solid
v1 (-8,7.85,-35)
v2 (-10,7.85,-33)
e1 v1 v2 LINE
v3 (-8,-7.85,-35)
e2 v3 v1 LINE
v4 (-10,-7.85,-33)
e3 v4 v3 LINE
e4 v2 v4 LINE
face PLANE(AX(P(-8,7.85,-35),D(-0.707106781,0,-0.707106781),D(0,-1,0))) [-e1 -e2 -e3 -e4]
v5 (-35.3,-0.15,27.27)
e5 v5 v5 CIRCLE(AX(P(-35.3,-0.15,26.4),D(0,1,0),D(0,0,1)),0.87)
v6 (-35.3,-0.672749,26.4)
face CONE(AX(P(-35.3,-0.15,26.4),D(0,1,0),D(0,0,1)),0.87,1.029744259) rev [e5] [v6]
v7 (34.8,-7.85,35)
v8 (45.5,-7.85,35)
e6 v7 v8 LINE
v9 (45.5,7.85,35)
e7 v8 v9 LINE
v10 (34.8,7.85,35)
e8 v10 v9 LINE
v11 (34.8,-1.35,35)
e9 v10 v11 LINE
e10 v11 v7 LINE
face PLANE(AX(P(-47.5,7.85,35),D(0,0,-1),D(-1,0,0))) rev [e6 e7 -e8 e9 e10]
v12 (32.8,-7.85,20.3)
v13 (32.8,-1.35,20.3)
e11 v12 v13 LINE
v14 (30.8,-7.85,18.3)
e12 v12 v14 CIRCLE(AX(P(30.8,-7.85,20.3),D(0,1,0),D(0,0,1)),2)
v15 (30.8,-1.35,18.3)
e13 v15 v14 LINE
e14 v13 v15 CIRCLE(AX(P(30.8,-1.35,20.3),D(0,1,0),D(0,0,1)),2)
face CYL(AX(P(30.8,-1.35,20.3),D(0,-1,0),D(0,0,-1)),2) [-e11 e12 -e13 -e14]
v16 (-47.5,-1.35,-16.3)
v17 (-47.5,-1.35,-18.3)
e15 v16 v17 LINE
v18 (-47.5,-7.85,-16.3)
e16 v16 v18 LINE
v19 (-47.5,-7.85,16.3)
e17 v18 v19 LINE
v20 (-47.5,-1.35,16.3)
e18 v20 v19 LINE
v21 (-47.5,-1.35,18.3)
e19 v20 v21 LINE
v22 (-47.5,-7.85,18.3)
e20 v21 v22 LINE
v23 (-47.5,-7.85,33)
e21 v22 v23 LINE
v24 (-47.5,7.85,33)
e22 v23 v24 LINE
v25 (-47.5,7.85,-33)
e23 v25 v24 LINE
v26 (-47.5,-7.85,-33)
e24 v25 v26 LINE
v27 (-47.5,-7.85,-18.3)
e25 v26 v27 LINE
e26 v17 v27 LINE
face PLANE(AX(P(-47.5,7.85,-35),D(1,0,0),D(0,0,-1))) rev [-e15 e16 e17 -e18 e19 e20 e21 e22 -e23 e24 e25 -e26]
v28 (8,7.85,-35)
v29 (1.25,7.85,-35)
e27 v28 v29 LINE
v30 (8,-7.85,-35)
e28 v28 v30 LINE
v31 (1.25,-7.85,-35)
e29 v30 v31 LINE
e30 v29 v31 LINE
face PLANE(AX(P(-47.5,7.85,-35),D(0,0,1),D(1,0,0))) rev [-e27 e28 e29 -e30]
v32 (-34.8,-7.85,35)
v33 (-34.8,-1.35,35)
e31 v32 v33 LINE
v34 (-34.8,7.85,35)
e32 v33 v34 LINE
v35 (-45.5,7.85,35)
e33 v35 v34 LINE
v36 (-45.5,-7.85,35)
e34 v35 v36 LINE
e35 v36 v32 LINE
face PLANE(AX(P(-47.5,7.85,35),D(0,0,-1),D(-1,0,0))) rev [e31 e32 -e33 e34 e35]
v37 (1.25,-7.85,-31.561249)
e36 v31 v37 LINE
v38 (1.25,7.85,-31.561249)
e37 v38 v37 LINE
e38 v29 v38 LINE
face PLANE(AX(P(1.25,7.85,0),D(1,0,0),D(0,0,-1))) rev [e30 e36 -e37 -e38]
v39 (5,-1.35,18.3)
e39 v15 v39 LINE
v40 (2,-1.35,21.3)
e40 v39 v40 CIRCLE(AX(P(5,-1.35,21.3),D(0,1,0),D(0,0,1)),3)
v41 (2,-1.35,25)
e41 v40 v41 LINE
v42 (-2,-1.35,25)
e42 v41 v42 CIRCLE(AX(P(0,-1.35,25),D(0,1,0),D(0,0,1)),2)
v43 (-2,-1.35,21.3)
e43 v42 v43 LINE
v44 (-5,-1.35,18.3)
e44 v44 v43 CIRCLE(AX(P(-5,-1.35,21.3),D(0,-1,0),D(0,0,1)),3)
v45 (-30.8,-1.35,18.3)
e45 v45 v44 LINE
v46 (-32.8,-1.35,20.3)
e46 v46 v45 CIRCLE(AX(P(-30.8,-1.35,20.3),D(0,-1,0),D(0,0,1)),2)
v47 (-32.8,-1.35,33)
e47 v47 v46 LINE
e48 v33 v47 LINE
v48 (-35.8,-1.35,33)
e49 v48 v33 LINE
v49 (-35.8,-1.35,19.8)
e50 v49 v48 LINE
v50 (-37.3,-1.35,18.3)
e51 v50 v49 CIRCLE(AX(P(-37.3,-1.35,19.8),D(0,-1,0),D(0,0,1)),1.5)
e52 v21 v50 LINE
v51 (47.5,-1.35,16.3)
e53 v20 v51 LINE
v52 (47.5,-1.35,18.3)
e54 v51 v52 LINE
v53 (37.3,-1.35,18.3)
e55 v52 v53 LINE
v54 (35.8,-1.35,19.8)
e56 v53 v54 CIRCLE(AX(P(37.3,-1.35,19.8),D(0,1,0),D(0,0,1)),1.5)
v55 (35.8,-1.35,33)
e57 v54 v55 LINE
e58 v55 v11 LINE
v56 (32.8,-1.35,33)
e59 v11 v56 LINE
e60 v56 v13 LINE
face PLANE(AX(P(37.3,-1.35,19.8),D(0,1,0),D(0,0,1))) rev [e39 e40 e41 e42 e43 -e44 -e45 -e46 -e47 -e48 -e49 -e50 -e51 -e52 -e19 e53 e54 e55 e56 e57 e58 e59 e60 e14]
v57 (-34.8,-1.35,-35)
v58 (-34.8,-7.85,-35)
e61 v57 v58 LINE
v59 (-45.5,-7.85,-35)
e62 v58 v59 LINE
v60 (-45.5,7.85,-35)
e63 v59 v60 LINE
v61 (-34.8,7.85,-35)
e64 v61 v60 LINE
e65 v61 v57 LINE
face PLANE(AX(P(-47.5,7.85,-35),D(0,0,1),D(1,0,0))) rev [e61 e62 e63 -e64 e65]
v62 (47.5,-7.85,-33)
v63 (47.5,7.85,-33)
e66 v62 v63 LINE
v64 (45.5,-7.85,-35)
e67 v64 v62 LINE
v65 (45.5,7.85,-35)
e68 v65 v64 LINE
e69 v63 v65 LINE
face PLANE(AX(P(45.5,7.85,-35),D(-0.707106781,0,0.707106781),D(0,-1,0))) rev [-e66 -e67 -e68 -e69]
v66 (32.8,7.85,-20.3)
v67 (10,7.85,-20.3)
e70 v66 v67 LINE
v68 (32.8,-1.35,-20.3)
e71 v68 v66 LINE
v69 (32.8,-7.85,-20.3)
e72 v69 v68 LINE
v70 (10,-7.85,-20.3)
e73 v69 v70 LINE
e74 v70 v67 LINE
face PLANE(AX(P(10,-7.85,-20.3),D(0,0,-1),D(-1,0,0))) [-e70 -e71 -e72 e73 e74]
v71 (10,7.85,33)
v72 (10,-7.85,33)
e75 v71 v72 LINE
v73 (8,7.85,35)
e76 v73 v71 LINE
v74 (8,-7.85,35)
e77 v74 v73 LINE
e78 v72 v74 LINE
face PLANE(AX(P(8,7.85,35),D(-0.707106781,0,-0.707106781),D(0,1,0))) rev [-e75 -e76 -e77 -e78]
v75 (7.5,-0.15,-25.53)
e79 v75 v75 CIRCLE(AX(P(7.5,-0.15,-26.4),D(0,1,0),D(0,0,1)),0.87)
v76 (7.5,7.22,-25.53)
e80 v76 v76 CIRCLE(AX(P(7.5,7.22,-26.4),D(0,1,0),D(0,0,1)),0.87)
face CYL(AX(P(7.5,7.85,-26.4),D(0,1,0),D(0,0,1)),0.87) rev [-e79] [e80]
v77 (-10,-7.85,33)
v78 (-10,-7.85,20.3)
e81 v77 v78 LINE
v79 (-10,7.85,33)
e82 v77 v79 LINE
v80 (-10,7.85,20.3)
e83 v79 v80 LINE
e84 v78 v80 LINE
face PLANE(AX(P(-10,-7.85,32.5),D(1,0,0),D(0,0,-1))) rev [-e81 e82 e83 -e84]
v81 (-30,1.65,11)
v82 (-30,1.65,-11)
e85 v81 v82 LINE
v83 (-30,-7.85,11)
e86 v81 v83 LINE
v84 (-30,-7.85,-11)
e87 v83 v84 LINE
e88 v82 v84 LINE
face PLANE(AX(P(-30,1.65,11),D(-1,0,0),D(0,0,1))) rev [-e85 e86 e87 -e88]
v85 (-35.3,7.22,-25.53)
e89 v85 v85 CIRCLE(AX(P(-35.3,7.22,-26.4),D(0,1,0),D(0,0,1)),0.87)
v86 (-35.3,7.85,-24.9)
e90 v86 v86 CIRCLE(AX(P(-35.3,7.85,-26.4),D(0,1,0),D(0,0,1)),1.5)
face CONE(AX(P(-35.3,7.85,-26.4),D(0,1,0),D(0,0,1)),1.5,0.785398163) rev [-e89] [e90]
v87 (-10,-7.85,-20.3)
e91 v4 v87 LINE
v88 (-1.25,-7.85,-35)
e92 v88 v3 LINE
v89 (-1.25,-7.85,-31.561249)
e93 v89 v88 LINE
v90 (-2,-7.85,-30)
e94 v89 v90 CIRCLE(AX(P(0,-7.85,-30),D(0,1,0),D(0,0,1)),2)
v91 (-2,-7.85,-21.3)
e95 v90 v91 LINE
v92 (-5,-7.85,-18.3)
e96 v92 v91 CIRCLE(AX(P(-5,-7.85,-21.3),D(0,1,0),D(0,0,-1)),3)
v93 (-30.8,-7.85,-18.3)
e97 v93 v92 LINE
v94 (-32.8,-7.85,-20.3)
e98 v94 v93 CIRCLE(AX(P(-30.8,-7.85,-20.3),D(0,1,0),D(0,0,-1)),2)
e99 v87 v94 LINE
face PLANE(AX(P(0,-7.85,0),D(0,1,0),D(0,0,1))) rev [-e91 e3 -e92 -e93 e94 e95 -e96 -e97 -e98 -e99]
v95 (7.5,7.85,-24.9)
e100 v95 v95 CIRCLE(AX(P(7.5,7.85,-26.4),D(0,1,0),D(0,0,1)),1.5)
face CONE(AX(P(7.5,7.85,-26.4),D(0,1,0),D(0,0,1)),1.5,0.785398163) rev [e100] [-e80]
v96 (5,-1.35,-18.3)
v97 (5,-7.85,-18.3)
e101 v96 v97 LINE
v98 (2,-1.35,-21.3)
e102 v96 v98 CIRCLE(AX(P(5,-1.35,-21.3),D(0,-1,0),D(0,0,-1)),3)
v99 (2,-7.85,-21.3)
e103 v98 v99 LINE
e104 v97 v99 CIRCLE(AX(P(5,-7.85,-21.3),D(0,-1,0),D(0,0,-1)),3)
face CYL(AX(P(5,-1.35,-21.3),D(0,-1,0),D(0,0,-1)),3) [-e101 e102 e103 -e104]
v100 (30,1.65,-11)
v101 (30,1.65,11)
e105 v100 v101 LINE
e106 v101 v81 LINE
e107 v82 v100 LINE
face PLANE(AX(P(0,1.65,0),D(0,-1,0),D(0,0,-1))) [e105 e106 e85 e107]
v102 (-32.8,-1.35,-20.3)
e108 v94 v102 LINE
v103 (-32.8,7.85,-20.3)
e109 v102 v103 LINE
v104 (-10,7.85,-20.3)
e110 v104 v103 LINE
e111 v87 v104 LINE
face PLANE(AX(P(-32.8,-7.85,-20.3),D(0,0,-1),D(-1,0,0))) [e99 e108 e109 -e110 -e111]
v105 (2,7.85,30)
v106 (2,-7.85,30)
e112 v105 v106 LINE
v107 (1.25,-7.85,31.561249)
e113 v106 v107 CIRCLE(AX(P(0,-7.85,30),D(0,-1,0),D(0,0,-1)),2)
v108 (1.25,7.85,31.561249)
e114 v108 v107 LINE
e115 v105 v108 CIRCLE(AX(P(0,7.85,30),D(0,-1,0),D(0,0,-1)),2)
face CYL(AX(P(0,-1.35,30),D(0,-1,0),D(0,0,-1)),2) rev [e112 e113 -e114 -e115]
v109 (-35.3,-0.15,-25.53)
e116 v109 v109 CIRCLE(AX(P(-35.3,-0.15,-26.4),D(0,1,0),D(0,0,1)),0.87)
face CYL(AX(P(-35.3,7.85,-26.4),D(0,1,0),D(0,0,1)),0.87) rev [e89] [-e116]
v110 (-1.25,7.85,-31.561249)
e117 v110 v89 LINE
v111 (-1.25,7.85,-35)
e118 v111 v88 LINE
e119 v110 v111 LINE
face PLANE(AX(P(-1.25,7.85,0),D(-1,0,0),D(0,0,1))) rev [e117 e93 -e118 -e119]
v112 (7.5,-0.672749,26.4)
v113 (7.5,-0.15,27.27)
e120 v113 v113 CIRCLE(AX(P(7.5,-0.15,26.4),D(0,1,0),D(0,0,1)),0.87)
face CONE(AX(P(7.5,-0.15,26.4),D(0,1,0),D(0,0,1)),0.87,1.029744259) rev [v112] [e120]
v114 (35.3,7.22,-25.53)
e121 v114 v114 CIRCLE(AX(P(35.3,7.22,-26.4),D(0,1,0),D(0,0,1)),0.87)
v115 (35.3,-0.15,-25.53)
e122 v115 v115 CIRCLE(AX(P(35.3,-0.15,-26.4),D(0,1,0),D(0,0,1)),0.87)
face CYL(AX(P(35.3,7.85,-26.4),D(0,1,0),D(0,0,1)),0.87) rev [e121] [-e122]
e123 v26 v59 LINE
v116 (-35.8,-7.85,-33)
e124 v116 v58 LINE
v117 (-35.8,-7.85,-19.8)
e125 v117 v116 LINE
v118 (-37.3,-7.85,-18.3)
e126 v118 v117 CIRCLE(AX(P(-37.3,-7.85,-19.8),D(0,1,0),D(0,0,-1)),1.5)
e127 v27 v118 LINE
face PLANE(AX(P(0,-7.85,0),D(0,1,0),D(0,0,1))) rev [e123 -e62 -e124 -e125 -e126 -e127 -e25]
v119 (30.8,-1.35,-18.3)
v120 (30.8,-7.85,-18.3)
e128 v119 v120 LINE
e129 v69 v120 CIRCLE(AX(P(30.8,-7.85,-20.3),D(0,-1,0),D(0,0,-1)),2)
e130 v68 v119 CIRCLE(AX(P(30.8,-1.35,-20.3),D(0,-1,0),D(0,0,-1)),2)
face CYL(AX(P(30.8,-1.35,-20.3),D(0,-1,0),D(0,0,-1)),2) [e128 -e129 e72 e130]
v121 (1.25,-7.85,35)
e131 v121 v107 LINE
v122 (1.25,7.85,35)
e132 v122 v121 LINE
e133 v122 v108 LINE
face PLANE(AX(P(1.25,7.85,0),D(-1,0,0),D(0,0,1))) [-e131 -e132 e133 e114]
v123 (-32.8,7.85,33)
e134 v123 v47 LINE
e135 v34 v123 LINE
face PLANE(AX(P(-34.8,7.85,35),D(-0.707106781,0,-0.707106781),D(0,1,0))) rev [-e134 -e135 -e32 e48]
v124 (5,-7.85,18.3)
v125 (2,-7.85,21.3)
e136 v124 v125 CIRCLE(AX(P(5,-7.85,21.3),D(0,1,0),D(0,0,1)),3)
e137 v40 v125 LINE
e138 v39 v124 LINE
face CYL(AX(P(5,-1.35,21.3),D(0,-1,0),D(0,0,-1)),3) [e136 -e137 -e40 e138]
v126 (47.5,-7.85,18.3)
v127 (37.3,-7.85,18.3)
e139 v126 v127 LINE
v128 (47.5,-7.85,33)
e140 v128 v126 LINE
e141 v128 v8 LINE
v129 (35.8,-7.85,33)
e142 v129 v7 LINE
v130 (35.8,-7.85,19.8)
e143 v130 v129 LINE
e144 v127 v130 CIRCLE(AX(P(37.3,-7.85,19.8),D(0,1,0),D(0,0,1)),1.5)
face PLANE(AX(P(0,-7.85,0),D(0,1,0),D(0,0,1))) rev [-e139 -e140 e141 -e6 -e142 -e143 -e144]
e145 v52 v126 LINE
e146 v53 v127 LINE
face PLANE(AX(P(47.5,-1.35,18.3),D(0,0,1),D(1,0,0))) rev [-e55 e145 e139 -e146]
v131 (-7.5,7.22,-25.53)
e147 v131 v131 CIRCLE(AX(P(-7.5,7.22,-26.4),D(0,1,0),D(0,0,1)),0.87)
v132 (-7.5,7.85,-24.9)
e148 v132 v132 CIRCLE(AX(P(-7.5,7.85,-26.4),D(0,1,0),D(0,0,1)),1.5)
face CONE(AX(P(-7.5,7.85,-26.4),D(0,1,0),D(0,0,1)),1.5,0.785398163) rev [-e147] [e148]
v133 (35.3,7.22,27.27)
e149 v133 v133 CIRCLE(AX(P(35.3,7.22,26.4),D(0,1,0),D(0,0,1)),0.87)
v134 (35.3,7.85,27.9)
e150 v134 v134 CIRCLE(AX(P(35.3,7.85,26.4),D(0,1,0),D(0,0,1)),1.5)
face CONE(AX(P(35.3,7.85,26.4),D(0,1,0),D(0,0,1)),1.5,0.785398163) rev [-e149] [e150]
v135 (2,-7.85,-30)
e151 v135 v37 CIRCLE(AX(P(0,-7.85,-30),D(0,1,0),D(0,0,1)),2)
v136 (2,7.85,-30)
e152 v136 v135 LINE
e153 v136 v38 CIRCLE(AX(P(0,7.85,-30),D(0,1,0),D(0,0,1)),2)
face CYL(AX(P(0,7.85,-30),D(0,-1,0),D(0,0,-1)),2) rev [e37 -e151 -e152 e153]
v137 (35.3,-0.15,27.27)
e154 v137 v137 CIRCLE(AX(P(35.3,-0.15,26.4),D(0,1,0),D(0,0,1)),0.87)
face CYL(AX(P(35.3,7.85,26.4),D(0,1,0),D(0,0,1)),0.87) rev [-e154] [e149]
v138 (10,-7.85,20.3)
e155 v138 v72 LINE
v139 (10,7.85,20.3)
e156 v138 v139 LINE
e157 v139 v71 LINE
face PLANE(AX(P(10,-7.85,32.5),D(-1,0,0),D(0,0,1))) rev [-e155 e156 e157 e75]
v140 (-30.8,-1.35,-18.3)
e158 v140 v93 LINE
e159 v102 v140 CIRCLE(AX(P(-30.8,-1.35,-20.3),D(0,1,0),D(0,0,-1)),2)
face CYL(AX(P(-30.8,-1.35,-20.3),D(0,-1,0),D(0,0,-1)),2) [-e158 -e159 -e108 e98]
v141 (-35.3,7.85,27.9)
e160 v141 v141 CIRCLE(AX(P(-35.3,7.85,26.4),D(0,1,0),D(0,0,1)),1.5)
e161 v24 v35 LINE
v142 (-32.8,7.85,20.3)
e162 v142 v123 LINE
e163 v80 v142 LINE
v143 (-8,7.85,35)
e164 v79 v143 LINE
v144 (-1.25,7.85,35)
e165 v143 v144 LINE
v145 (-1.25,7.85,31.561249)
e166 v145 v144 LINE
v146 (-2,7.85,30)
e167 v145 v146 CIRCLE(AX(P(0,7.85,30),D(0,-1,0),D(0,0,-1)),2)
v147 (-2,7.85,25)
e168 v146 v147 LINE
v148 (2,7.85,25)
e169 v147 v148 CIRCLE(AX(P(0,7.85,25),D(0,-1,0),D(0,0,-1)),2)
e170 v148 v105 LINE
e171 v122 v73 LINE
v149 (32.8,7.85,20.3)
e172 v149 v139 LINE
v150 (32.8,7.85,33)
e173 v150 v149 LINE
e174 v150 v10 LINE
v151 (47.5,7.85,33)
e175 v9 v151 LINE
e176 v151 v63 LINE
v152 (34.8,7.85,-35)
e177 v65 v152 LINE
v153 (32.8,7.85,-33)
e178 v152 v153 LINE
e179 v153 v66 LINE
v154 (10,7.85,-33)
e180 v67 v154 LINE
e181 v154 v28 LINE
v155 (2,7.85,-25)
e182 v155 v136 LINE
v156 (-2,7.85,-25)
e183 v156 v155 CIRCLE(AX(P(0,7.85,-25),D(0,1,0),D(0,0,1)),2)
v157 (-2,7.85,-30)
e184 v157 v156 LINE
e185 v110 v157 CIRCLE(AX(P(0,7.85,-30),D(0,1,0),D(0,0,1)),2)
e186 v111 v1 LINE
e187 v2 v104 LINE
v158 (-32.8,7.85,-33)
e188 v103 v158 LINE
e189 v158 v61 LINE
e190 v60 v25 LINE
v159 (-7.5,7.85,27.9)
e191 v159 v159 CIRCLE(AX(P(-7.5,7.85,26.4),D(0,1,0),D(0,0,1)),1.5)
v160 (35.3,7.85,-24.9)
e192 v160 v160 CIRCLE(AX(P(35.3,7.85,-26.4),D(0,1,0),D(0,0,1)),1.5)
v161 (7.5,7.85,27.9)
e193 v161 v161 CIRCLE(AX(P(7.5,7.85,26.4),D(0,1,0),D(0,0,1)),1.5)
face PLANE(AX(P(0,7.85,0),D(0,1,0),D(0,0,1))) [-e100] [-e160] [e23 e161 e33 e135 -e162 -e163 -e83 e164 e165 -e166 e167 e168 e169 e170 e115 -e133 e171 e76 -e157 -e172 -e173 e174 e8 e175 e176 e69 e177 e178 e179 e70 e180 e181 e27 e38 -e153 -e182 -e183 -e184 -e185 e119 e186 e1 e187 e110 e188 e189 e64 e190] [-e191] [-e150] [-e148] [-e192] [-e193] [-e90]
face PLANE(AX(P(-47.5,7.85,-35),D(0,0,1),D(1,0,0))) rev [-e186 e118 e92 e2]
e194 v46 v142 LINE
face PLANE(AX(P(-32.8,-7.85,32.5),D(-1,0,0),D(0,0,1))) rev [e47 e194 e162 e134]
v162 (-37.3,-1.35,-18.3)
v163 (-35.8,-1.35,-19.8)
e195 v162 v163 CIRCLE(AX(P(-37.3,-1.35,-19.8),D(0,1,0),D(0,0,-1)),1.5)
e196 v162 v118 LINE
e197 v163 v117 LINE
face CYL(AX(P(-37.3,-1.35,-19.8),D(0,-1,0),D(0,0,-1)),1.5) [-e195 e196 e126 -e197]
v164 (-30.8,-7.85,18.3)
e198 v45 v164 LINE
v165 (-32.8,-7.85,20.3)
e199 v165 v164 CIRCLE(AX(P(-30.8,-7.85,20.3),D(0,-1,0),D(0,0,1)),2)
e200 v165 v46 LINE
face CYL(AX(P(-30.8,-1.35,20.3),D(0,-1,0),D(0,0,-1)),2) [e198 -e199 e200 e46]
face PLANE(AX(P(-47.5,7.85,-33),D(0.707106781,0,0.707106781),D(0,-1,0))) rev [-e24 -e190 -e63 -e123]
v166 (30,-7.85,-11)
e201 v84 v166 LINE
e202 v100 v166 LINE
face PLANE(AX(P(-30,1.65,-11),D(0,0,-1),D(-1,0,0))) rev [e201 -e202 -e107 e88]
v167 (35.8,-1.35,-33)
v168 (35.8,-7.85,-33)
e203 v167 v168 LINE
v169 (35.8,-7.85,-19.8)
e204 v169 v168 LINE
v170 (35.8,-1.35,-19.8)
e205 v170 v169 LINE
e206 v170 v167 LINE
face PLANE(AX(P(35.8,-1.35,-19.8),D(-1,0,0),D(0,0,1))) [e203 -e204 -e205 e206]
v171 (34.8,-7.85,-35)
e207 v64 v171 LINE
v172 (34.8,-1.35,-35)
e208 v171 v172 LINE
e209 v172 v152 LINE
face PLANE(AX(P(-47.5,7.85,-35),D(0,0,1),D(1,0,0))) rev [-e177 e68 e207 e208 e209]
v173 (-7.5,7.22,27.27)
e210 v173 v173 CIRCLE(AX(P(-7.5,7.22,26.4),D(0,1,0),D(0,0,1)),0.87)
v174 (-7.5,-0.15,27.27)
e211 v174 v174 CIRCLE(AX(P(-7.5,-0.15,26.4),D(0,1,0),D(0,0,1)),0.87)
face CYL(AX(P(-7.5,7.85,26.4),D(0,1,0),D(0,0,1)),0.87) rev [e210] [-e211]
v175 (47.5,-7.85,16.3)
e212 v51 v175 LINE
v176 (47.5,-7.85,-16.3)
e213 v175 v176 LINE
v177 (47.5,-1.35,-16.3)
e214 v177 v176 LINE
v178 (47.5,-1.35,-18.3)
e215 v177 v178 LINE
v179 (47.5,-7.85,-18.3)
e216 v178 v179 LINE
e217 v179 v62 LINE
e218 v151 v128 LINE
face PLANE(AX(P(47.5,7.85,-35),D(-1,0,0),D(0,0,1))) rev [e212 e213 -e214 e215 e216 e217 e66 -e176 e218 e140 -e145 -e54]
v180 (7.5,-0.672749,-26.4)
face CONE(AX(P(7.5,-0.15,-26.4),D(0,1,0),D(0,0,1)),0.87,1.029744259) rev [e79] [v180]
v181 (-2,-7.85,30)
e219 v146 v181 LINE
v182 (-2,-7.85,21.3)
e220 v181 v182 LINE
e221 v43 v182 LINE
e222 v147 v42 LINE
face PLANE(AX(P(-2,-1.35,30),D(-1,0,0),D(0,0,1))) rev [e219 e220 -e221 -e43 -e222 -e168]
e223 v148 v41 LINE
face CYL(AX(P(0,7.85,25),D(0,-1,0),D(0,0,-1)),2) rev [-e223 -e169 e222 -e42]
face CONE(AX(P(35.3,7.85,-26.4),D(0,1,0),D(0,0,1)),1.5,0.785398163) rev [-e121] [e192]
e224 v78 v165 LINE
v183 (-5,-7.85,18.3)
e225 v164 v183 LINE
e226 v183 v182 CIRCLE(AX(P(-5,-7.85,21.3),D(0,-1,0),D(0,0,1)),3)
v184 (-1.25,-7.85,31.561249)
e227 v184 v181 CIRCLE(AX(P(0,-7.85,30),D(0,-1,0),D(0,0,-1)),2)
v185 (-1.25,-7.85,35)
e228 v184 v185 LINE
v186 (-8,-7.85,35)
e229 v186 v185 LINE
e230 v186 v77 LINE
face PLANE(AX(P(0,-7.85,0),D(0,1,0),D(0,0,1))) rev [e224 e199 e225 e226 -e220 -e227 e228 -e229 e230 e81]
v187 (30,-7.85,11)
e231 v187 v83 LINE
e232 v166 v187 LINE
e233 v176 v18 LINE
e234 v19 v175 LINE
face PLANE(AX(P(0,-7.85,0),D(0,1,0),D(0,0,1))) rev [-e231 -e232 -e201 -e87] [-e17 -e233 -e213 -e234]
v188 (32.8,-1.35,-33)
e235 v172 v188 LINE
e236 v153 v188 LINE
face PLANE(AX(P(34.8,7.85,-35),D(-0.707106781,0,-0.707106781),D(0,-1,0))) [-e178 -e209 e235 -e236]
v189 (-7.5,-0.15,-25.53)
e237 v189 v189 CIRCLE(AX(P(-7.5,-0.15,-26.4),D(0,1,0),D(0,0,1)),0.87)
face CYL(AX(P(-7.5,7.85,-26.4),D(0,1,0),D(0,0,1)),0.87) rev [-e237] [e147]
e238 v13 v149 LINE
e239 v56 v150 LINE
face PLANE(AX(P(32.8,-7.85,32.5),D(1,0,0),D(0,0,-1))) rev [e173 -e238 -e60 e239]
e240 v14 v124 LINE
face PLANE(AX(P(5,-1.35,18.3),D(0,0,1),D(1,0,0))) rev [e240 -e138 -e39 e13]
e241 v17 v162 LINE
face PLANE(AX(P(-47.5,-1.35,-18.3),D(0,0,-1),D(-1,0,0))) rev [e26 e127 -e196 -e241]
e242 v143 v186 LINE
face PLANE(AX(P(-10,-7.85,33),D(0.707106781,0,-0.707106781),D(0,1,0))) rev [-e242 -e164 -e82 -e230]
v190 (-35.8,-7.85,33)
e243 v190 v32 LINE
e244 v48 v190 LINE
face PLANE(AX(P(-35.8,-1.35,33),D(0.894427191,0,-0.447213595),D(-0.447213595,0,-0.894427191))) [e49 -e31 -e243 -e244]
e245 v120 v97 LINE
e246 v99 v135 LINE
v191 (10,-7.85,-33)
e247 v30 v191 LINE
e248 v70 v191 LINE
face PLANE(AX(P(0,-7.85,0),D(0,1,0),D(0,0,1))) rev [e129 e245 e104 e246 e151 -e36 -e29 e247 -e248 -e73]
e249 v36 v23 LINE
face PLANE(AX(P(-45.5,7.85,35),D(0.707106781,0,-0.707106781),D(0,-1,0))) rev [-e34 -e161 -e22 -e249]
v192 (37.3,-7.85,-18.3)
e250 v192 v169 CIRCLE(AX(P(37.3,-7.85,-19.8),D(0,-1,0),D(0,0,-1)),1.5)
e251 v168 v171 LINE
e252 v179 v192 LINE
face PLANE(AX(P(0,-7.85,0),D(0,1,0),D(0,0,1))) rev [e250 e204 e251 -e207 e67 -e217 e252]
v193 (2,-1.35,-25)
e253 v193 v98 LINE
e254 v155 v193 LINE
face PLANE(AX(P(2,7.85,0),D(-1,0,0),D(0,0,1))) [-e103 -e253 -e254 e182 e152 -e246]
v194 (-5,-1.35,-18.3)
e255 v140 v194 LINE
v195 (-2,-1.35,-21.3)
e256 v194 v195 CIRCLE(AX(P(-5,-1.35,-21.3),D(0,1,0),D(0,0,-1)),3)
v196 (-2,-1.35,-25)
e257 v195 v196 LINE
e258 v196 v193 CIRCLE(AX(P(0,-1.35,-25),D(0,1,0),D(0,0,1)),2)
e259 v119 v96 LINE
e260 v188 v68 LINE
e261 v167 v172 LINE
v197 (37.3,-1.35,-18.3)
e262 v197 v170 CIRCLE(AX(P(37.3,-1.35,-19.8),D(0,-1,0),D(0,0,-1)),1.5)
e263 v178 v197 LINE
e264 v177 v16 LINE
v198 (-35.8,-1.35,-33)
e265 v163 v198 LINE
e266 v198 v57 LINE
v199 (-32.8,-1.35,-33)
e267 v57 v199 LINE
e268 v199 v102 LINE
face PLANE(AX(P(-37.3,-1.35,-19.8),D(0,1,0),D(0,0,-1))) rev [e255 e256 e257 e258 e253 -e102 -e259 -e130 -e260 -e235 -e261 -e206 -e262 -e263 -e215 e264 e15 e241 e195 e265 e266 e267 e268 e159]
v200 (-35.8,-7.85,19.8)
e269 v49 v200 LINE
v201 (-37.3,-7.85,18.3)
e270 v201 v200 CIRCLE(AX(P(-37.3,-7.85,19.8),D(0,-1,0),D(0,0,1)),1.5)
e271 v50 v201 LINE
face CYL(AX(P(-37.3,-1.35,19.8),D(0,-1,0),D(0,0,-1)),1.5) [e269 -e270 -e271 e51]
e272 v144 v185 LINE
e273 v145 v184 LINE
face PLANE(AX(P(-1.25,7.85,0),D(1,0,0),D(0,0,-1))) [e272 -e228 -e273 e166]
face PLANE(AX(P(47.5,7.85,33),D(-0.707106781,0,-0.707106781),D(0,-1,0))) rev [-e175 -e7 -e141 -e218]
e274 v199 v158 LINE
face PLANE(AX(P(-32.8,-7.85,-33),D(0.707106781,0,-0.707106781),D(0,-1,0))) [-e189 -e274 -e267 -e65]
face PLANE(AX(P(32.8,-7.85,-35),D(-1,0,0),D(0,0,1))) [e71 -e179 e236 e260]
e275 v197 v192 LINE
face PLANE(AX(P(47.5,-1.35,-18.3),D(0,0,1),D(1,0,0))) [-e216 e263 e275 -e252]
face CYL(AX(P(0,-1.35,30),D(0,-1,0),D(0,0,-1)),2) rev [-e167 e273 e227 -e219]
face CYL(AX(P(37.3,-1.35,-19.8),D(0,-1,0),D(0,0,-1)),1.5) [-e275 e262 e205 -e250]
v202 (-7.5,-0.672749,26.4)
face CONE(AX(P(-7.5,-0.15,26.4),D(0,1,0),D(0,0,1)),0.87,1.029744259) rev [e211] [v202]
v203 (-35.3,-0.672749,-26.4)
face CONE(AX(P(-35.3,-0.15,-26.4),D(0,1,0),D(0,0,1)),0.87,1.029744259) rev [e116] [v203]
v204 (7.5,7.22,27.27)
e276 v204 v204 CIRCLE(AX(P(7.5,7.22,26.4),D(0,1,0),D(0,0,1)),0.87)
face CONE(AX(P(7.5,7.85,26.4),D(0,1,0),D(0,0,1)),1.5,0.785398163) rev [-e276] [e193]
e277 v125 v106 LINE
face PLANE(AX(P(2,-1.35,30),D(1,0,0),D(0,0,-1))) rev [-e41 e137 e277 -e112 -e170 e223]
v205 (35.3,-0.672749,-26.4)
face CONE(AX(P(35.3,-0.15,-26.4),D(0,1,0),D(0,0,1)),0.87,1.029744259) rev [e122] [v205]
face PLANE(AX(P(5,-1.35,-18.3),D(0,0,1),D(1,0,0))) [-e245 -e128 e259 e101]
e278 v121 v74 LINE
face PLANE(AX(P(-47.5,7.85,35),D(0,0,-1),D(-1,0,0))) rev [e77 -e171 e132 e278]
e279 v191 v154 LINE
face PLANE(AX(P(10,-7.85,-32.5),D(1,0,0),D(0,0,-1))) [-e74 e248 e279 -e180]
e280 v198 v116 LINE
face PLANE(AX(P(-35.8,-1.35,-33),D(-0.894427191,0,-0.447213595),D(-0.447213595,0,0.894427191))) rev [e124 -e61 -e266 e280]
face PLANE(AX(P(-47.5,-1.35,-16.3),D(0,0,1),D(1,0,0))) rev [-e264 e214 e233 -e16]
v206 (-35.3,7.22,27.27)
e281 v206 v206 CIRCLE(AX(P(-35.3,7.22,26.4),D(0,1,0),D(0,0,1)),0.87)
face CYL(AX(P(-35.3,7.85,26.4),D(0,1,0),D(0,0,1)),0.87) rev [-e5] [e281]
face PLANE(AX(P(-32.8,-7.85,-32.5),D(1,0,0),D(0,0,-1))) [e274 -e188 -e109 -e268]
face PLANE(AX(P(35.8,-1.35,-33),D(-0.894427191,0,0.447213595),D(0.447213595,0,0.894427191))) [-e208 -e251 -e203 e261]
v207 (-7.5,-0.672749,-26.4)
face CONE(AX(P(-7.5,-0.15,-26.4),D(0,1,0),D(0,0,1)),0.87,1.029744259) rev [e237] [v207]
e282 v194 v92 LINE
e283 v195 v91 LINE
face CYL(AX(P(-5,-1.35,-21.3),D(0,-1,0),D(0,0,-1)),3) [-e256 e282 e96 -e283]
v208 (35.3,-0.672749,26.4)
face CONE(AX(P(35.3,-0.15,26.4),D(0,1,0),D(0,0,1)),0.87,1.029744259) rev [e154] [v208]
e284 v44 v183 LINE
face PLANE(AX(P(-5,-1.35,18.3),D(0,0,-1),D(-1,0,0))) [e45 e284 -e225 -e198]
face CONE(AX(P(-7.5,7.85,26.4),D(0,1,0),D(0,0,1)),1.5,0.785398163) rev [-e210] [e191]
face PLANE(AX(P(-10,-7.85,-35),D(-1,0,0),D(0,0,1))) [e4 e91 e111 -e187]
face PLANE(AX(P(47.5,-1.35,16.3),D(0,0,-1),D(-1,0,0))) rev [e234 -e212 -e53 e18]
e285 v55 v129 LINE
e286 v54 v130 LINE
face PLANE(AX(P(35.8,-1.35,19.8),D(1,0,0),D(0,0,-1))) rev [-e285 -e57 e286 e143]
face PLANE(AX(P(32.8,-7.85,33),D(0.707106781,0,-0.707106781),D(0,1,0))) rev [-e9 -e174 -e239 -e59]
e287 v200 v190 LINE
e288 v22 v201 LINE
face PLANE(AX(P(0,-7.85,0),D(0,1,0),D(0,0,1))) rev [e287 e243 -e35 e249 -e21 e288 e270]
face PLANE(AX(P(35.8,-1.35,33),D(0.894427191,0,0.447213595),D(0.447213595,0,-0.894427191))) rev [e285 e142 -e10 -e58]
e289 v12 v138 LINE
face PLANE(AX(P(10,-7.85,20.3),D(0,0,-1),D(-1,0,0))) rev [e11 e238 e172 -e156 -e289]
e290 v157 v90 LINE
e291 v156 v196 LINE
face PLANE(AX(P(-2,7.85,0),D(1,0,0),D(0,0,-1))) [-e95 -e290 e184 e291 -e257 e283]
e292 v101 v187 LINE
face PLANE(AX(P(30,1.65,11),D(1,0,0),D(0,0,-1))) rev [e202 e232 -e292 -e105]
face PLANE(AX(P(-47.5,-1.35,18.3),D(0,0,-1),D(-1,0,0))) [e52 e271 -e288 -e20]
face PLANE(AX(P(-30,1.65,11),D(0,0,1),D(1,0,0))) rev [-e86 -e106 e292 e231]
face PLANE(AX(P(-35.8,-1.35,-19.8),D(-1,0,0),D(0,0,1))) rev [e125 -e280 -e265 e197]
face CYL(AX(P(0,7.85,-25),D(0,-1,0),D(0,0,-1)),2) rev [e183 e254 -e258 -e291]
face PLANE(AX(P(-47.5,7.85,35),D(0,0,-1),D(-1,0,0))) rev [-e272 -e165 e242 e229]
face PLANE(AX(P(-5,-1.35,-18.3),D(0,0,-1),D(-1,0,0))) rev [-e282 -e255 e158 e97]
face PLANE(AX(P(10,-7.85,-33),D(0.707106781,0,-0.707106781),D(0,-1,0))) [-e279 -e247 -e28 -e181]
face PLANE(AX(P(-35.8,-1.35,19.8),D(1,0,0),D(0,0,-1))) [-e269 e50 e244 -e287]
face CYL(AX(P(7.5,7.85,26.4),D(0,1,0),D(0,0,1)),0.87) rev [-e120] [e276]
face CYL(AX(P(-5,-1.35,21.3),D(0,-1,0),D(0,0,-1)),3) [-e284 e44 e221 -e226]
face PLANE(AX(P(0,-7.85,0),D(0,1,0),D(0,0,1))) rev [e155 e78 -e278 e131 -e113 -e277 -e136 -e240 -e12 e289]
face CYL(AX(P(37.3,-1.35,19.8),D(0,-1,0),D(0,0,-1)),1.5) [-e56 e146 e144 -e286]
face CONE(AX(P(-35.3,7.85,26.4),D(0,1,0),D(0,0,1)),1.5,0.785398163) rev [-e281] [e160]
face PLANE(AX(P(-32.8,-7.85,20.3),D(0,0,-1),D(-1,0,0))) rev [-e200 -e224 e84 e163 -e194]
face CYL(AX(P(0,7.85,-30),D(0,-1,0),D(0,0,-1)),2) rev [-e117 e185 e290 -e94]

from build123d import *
from build123d.topology import SkipClean

# Parameters (mm, degrees)
SKETCH1_W            = 95
SKETCH1_H            = 70
BOSS_EXTRUDE1_DEPTH  = 7.85
CUT_EXTRUDE1_DEPTH   = 62.055220907
CHAMFER1_SIZE        = 2
CUT_EXTRUDE2_DEPTH   = 6.5
CUT_EXTRUDE3_DEPTH   = 60.715073474
MIRROR3_COPY_1_DEPTH = 6.5
SKETCH7_W            = 60
SKETCH7_H            = 22
CUT_EXTRUDE4_DEPTH   = 9.5


# Read off the part's stored shape, not the designer's step: CSK for M2 Flat Head Machine Screw1
with BuildPart() as part:
    # Sketch1 → Boss-Extrude1 (new, symmetric)
    with BuildSketch(Plane(origin=(0, 0, 0), x_dir=(1, 0, 0), z_dir=(0, 1, 0))):
        Rectangle(SKETCH1_W, SKETCH1_H)
    extrude(amount=BOSS_EXTRUDE1_DEPTH, both=True)

    # Sketch2 → Cut-Extrude1 (cut, through all)
    with BuildSketch(Plane(origin=(0, 7.85, 0), x_dir=(1, 0, 0), z_dir=(0, 1, 0))):
        Polygon((-32.8, -32.5), (-32.8, -20.3), (-10, -20.3), (-10, -32.5), (-10, -35), (-32.8, -35), align=None)
        Polygon((10, -32.5), (10, -20.3), (32.8, -20.3), (32.8, -32.5), (32.8, -35), (10, -35), align=None)
    cut_extrude1 = extrude(amount=-CUT_EXTRUDE1_DEPTH, mode=Mode.SUBTRACT)

    # CSK for M2 Flat Head Machine Screw1 outl → CSK for M2 Flat Head Machine Screw1 (revolve, cut)
    with BuildSketch(Plane(origin=(35.3, 0, 26.4), x_dir=(1, 0, 0), z_dir=(0, 0, 1))):
        Polygon((0, 7.85), (0, -0.672748739), (0.87, -0.15), (0.87, 7.22), (1.5, 7.85), align=None)
    csk_for_m2_flat_head_machine_screw1 = revolve(axis=Axis((35.3, 0, 26.4), (0, 1, 0)), mode=Mode.SUBTRACT)

    # CSK for M2 Flat Head Machine Screw1 2 ou → CSK for M2 Flat Head Machine Screw1 2 (revolve, cut)
    with BuildSketch(Plane(origin=(7.5, 0, 26.4), x_dir=(1, 0, 0), z_dir=(0, 0, 1))):
        Polygon((0, 7.85), (0, -0.672748739), (0.87, -0.15), (0.87, 7.22), (1.5, 7.85), align=None)
    csk_for_m2_flat_head_machine_screw1_2 = revolve(axis=Axis((7.5, 0, 26.4), (0, 1, 0)), mode=Mode.SUBTRACT)

    # CSK for M2 Flat Head Machine Screw1 3 ou → CSK for M2 Flat Head Machine Screw1 3 (revolve, cut)
    with BuildSketch(Plane(origin=(-7.5, 0, 26.4), x_dir=(1, 0, 0), z_dir=(0, 0, 1))):
        Polygon((0, 7.85), (0, -0.672748739), (0.87, -0.15), (0.87, 7.22), (1.5, 7.85), align=None)
    csk_for_m2_flat_head_machine_screw1_3 = revolve(axis=Axis((-7.5, 0, 26.4), (0, 1, 0)), mode=Mode.SUBTRACT)

    # CSK for M2 Flat Head Machine Screw1 4 ou → CSK for M2 Flat Head Machine Screw1 4 (revolve, cut)
    with BuildSketch(Plane(origin=(-35.3, 0, 26.4), x_dir=(1, 0, 0), z_dir=(0, 0, 1))):
        Polygon((0, 7.85), (0, -0.672748739), (0.87, -0.15), (0.87, 7.22), (1.5, 7.85), align=None)
    csk_for_m2_flat_head_machine_screw1_4 = revolve(axis=Axis((-35.3, 0, 26.4), (0, 1, 0)), mode=Mode.SUBTRACT)

    # Mirror1: Cut-Extrude1, CSK for M2 Flat Head Machine Screw1, CSK for M2 Flat Head Machine Screw1 2, CSK for M2 Flat Head Machine Screw1 3, CSK for M2 Flat Head Machine Screw1 4 across plane
    add(cut_extrude1.mirror(Plane.XY), mode=Mode.SUBTRACT)
    add(csk_for_m2_flat_head_machine_screw1.mirror(Plane.XY), mode=Mode.SUBTRACT)
    add(csk_for_m2_flat_head_machine_screw1_2.mirror(Plane.XY), mode=Mode.SUBTRACT)
    add(csk_for_m2_flat_head_machine_screw1_3.mirror(Plane.XY), mode=Mode.SUBTRACT)
    add(csk_for_m2_flat_head_machine_screw1_4.mirror(Plane.XY), mode=Mode.SUBTRACT)

    # Chamfer1
    chamfer1_edges = [part.edges().sort_by_distance(p)[0] for p in [
        (-32.8, 0, 35),
        (-10, 0, 35),
        (10, 0, 35),
        (32.8, 0, 35),
        (47.5, 0, 35),
        (-47.5, 0, 35),
        (-47.5, 0, -35),
        (47.5, 0, -35),
        (-32.8, 0, -35),
        (-10, 0, -35),
        (10, 0, -35),
        (32.8, 0, -35),
    ]]
    chamfer(chamfer1_edges, length=CHAMFER1_SIZE)

    # Sketch5 → Cut-Extrude2 (cut)
    with BuildSketch(Plane.XZ.offset(7.85)):
        with BuildLine():
            Line((47.5, 16.3), (-2, 16.3))
            Line((-2, 16.3), (-2, 30))
            ThreePointArc((-2, 30), (0, 32), (2, 30))
            Line((2, 30), (2, 21.3))
            ThreePointArc((2, 21.3), (2.878679656, 19.178679656), (5, 18.3))
            Line((5, 18.3), (30.8, 18.3))
            ThreePointArc((30.8, 18.3), (32.214213562, 18.885786438), (32.8, 20.3))
            Line((32.8, 20.3), (32.8, 33))
            Line((32.8, 33), (34.8, 35))
            Line((34.8, 35), (35.8, 33))
            Line((35.8, 33), (35.8, 19.8))
            ThreePointArc((35.8, 19.8), (36.239339828, 18.739339828), (37.3, 18.3))
            Line((37.3, 18.3), (47.5, 18.3))
            Line((47.5, 18.3), (47.5, 16.3))
        make_face()
    cut_extrude2 = extrude(amount=-CUT_EXTRUDE2_DEPTH, mode=Mode.SUBTRACT)

    # Sketch6 → Cut-Extrude3 (cut, symmetric)
    with SkipClean():  # the faces are left unmerged after this step: merging them gives an invalid solid
        with BuildSketch(Plane.XZ.offset(1.35)):
            with BuildLine():
                Line((2, 25), (2, 30))
                ThreePointArc((2, 30), (1.802775638, 30.866025404), (1.25, 31.5612495))
                Line((1.25, 31.5612495), (1.25, 35))
                Line((1.25, 35), (-1.25, 35))
                Line((-1.25, 35), (-1.25, 31.5612495))
                ThreePointArc((-1.25, 31.5612495), (-1.802775638, 30.866025404), (-2, 30))
                Line((-2, 30), (-2, 25))
                ThreePointArc((-2, 25), (0, 23), (2, 25))
            make_face()
        cut_extrude3 = extrude(amount=CUT_EXTRUDE3_DEPTH, both=True, mode=Mode.SUBTRACT)
    add(part.part.scale(1), mode=Mode.REPLACE)  # the faces are merged on a copy

    # Mirror2: Cut-Extrude2 across plane
    add(cut_extrude2.mirror(Plane(origin=(0, 0, 0), x_dir=(0, 0, 1), z_dir=(1, 0, 0))), mode=Mode.SUBTRACT)

    # Mirror3: Cut-Extrude2, Cut-Extrude3 across plane
    add(cut_extrude2.mirror(Plane.XY), mode=Mode.SUBTRACT)
    add(cut_extrude3.mirror(Plane.XY), mode=Mode.SUBTRACT)

    # Mirror3 copy 1 sketch → Mirror3 copy 1 (cut)
    with BuildSketch(Plane(origin=(0, -7.85, 0), x_dir=(-1, 0, 0), z_dir=(0, -1, 0))):
        with BuildLine():
            Line((47.5, 16.3), (-2, 16.3))
            Line((-2, 16.3), (-2, 30))
            ThreePointArc((-2, 30), (0, 32), (2, 30))
            Line((2, 30), (2, 21.3))
            ThreePointArc((2, 21.3), (2.878679656, 19.178679656), (5, 18.3))
            Line((5, 18.3), (30.8, 18.3))
            ThreePointArc((30.8, 18.3), (32.214213562, 18.885786438), (32.8, 20.3))
            Line((32.8, 20.3), (32.8, 33))
            Line((32.8, 33), (34.8, 35))
            Line((34.8, 35), (35.8, 33))
            Line((35.8, 33), (35.8, 19.8))
            ThreePointArc((35.8, 19.8), (36.239339828, 18.739339828), (37.3, 18.3))
            Line((37.3, 18.3), (47.5, 18.3))
            Line((47.5, 18.3), (47.5, 16.3))
        make_face()
    extrude(amount=-MIRROR3_COPY_1_DEPTH, mode=Mode.SUBTRACT)

    # Sketch7 → Cut-Extrude4 (cut)
    with BuildSketch(Plane.XZ.offset(7.85)):
        Rectangle(SKETCH7_W, SKETCH7_H)
    extrude(amount=-CUT_EXTRUDE4_DEPTH, mode=Mode.SUBTRACT)


solid = part.part
